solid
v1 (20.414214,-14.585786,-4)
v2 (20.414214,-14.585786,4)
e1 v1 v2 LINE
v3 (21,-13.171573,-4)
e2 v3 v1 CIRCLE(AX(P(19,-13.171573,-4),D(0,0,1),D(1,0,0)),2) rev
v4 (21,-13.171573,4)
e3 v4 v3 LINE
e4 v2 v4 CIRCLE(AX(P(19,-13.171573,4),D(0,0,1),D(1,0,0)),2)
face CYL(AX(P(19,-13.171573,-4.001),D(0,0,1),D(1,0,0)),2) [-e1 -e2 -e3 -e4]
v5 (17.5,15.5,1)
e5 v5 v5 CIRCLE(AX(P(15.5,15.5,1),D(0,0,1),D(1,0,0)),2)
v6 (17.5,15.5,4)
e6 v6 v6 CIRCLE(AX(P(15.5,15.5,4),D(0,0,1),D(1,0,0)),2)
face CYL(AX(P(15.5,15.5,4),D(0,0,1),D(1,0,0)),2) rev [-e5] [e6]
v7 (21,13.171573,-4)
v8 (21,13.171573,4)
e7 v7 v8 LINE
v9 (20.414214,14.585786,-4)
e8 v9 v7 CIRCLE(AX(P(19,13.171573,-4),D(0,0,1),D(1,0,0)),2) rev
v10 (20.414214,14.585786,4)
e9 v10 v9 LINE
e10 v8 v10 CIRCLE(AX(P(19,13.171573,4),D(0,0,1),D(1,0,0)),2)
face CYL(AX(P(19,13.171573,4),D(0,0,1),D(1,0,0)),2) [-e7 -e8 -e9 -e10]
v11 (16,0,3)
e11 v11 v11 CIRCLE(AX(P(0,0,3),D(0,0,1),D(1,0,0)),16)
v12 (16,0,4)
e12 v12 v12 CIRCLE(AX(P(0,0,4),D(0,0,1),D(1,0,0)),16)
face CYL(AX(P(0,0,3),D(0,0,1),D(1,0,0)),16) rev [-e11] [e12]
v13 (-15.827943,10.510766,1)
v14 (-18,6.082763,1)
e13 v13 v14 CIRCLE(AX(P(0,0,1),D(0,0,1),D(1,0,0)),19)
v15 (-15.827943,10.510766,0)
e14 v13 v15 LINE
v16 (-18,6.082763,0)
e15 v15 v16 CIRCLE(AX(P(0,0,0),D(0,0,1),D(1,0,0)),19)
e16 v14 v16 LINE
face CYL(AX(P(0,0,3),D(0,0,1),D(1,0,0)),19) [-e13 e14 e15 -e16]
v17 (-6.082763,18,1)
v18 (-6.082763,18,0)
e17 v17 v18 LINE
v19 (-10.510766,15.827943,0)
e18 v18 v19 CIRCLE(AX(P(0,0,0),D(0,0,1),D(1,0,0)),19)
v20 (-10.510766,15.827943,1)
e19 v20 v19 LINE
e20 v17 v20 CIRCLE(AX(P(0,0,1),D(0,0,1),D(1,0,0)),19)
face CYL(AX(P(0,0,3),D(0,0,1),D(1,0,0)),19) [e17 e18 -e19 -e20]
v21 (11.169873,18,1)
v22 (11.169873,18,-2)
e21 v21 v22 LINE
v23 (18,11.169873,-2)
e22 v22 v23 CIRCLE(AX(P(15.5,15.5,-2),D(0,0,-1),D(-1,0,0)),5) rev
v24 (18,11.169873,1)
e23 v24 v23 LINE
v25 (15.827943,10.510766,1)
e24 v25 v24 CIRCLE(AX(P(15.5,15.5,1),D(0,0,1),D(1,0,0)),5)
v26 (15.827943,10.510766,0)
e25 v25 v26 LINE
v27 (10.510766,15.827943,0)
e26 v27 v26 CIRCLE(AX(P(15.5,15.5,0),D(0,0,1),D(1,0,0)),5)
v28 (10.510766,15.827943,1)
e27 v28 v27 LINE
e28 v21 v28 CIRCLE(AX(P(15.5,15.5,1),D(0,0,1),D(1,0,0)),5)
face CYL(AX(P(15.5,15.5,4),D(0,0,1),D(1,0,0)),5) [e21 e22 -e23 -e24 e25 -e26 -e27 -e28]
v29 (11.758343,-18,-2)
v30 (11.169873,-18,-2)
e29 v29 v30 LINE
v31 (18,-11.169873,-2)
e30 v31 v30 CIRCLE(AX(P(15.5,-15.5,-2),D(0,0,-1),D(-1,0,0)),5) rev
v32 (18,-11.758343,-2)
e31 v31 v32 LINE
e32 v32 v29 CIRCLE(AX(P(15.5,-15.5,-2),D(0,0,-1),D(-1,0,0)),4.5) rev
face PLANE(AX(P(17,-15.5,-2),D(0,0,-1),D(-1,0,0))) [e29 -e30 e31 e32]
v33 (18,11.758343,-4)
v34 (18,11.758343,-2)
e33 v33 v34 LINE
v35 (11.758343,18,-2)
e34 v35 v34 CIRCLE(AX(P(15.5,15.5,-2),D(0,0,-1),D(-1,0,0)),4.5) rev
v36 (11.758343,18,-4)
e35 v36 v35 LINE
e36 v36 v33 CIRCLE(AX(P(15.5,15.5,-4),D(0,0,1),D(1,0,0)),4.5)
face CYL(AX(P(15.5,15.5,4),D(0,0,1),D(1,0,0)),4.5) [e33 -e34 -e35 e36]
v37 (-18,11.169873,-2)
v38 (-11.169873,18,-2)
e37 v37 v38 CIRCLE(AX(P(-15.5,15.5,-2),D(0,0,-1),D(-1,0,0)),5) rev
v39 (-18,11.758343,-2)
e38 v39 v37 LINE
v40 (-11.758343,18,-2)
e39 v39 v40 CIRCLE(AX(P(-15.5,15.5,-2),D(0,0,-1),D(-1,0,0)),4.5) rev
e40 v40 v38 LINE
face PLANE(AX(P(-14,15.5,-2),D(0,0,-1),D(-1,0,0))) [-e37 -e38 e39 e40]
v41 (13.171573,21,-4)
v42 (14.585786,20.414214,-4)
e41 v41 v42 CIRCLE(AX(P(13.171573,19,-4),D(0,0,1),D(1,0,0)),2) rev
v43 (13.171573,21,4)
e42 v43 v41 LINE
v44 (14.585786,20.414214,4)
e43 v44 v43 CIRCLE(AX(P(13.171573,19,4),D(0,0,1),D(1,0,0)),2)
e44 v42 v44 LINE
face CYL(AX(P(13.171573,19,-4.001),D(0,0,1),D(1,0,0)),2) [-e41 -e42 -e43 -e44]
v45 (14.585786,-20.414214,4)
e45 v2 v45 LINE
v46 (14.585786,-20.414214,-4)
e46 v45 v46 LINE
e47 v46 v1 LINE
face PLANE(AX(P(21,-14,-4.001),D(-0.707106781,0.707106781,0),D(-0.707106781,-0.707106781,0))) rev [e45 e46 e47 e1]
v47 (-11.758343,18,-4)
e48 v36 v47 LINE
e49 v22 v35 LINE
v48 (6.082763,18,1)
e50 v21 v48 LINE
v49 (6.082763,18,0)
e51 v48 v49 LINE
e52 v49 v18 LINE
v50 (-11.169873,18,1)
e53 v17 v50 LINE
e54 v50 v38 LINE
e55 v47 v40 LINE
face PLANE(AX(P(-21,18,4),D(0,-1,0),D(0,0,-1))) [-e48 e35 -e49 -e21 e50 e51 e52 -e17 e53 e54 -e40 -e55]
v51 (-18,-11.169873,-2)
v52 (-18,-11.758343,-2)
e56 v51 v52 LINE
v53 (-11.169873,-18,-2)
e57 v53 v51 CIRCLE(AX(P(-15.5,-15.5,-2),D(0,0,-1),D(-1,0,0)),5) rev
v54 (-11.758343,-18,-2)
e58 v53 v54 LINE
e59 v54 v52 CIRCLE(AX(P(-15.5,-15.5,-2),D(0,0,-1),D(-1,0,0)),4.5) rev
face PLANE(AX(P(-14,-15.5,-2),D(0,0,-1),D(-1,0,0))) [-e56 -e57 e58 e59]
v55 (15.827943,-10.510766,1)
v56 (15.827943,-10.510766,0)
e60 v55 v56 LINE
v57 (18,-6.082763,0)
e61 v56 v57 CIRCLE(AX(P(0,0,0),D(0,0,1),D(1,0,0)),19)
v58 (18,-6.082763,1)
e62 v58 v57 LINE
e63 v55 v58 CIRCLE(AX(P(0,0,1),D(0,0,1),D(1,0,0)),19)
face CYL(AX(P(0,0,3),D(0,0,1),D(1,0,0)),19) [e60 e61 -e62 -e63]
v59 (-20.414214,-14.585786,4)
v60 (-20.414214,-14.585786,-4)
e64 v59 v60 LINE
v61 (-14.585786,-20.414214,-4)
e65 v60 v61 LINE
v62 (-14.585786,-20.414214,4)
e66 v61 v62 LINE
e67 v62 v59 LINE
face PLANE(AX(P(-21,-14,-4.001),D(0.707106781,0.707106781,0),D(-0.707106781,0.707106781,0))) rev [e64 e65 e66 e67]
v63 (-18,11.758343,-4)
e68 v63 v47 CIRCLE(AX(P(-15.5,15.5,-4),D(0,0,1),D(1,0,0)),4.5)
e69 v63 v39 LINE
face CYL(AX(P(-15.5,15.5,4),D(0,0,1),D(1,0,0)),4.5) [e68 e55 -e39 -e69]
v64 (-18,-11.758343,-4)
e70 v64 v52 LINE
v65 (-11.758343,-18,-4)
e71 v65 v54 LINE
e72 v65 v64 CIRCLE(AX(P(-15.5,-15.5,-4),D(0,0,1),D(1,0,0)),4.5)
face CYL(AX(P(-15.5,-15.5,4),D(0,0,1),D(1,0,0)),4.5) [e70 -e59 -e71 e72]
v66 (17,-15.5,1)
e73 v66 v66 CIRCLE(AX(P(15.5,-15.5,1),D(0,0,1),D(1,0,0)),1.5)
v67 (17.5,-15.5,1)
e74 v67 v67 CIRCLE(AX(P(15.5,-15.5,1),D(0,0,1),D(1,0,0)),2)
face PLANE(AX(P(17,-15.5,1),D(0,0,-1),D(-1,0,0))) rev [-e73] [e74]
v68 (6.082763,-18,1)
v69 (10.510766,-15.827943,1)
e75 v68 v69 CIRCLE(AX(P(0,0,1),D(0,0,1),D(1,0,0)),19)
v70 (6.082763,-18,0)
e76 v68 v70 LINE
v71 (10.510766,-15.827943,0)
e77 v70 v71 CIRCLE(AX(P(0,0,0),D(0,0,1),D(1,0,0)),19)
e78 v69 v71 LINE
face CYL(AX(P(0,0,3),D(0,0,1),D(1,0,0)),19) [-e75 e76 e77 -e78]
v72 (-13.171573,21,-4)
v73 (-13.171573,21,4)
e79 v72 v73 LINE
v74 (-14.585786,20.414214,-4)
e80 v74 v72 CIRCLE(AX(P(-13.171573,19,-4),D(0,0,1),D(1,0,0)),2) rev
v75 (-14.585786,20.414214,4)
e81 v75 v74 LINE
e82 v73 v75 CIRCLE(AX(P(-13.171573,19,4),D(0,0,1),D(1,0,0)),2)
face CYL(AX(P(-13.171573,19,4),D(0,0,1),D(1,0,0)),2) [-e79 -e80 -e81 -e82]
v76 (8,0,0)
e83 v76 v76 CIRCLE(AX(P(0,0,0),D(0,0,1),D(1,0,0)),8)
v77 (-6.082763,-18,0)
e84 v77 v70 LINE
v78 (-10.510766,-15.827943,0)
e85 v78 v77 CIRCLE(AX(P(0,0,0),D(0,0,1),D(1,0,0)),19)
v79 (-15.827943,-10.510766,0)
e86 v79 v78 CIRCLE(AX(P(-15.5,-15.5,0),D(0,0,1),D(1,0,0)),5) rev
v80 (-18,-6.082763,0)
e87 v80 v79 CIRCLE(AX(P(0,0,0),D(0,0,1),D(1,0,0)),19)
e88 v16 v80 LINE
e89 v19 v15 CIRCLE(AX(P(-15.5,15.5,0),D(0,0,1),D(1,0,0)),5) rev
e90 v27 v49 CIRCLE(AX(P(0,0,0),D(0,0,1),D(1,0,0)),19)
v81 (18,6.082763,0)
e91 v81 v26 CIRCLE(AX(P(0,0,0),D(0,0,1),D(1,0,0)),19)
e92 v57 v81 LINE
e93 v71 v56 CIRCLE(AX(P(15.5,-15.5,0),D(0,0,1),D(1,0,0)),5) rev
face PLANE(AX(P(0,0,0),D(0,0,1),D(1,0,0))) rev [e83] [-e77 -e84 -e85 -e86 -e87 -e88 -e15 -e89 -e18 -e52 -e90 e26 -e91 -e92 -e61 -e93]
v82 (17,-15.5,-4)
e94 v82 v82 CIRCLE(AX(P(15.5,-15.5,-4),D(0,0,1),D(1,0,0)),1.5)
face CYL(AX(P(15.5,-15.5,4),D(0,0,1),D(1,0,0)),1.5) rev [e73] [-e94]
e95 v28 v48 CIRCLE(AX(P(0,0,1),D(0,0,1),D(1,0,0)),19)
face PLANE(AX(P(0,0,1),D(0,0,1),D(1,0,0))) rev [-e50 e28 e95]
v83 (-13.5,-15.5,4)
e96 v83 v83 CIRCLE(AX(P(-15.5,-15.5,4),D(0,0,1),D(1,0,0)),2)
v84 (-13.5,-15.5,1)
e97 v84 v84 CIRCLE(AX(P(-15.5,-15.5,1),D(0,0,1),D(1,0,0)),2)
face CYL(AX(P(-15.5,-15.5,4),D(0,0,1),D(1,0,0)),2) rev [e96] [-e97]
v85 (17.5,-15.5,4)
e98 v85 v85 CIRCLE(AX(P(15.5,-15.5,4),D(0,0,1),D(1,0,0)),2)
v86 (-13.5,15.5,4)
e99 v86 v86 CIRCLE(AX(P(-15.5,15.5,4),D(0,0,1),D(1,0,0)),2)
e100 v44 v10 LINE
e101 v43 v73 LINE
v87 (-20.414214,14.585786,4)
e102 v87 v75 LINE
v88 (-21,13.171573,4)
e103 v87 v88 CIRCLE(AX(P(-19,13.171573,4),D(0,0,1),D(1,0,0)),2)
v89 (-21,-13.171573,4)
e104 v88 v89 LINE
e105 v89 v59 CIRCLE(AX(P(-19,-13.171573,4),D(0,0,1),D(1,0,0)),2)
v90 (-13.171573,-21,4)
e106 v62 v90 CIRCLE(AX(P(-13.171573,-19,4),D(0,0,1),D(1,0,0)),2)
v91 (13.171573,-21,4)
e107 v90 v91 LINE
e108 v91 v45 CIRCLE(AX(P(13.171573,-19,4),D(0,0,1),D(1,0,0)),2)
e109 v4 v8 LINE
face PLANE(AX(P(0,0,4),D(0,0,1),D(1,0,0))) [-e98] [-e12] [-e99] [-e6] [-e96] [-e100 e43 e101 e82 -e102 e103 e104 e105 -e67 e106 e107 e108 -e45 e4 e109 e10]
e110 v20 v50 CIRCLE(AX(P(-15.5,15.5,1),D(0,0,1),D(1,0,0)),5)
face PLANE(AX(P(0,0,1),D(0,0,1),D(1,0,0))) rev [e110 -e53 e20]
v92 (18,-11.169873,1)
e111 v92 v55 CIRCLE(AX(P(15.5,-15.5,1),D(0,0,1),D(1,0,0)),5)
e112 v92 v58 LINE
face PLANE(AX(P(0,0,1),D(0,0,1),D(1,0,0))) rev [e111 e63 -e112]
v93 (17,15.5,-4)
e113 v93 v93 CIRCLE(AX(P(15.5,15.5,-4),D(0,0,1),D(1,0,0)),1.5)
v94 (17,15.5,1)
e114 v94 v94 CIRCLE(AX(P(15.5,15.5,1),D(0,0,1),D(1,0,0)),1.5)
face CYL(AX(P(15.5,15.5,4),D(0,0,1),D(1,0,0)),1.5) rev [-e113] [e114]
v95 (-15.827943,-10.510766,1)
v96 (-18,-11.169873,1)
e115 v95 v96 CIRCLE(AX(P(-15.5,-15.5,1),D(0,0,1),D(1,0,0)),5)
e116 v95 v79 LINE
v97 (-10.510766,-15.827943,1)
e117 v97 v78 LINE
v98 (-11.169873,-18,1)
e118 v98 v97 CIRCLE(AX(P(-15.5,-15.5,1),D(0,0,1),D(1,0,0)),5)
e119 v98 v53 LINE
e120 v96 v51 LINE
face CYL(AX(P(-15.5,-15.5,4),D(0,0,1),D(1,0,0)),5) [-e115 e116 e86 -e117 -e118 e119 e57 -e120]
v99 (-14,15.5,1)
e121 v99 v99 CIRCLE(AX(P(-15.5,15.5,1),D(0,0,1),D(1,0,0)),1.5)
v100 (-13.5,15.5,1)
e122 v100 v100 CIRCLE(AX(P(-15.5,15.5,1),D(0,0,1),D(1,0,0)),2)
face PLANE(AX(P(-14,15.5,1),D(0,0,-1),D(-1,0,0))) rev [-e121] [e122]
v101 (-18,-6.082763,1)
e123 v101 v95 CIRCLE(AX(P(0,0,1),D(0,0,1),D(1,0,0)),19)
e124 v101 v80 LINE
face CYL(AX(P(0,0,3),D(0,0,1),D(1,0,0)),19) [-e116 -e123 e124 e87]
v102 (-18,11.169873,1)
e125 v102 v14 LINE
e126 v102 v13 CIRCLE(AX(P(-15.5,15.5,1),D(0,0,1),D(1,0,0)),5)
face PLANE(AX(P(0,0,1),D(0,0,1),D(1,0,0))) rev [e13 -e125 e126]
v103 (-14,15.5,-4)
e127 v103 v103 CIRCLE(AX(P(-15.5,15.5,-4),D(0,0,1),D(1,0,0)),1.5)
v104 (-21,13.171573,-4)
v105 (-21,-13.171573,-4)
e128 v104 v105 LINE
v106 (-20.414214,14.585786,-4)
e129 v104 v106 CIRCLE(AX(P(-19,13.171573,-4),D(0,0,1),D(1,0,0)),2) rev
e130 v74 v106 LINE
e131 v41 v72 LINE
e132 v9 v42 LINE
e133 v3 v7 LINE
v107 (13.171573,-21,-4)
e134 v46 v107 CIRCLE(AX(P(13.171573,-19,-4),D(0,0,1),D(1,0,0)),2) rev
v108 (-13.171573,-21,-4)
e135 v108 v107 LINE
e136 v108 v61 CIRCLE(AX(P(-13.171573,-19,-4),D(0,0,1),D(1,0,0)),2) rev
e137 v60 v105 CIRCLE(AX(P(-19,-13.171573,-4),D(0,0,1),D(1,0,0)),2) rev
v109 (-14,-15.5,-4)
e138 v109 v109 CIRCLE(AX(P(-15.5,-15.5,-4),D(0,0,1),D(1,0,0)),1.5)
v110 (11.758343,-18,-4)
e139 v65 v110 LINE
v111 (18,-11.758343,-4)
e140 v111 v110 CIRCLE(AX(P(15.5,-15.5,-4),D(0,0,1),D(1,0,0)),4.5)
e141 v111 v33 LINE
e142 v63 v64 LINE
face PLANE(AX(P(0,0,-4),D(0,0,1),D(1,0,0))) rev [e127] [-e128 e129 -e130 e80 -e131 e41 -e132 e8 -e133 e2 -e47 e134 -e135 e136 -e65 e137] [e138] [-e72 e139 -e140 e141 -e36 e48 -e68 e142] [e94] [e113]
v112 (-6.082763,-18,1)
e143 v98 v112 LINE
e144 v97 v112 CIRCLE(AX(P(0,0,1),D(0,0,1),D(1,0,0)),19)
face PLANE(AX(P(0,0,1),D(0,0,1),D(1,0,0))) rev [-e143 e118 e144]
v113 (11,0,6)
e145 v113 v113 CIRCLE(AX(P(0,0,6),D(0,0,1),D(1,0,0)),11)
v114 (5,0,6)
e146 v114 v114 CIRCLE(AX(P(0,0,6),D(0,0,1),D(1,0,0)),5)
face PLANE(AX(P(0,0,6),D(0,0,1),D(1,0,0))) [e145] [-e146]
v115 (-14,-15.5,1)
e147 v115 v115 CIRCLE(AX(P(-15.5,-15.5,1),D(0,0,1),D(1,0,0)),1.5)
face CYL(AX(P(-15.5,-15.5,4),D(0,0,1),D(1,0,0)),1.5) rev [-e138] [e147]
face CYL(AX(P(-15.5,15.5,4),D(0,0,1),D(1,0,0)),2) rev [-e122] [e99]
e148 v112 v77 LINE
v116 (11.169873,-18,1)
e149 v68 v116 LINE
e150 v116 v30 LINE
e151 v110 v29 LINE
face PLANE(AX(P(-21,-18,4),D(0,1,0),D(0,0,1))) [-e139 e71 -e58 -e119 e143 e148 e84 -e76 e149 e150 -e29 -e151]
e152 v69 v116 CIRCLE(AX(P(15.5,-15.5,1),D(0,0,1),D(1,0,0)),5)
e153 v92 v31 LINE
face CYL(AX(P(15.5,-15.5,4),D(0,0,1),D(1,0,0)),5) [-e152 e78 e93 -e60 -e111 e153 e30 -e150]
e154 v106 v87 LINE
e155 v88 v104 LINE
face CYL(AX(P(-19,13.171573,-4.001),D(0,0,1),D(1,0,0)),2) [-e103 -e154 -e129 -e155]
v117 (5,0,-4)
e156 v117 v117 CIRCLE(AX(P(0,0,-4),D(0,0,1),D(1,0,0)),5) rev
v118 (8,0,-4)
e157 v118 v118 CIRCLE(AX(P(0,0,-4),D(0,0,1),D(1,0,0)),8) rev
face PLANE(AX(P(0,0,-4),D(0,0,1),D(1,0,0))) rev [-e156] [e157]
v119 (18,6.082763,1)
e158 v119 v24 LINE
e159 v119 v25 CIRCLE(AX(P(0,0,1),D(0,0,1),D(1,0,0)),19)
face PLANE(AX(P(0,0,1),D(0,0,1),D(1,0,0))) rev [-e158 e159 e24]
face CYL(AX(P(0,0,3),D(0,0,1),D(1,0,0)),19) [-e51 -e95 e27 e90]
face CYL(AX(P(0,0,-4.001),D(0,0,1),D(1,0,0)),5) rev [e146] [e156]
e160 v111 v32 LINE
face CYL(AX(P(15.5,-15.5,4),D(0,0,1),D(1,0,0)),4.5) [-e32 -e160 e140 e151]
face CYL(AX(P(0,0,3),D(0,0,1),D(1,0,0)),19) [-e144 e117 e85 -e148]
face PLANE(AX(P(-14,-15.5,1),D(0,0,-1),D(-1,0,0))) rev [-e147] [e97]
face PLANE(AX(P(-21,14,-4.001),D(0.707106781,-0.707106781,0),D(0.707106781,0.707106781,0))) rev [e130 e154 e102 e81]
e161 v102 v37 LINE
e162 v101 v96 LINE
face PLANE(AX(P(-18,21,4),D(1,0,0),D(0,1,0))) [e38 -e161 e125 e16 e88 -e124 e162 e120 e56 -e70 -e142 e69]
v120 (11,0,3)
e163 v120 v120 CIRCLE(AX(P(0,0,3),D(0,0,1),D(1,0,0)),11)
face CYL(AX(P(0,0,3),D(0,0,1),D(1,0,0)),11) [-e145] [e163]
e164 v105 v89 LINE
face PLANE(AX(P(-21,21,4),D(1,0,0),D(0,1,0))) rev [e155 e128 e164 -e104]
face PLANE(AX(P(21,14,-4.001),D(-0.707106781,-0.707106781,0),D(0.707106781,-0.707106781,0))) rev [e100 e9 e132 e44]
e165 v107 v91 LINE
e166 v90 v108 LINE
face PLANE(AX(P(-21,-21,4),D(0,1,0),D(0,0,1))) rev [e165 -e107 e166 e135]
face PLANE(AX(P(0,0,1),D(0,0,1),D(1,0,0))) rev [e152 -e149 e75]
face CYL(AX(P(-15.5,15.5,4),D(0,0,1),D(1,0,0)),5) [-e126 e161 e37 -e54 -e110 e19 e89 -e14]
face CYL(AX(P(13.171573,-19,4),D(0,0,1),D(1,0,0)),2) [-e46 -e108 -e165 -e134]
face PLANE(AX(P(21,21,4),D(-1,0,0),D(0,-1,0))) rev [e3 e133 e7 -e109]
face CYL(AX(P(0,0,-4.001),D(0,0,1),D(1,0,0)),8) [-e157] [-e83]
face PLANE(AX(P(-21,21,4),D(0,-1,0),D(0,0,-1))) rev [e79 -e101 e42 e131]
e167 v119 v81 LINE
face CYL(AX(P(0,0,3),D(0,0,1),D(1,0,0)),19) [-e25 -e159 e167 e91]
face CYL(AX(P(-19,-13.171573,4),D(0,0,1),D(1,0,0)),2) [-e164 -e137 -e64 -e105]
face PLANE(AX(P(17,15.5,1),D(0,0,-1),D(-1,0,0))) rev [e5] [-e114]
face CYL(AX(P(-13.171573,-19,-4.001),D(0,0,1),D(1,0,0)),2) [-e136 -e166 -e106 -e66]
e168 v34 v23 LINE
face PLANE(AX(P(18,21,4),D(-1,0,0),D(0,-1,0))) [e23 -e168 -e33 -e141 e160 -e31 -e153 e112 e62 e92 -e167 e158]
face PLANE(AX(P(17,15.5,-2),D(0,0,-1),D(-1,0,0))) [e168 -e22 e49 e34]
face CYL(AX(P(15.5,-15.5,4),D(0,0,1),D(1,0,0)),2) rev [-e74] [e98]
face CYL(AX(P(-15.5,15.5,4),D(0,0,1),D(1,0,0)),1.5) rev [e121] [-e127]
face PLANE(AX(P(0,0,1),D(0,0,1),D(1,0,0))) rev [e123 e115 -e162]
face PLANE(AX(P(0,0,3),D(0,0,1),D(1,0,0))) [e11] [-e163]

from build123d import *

# Parameters (mm, degrees)
SKETCH1_W                               = 42
SKETCH1_H                               = 42
BOSS_EXTRUDE1_DEPTH                     = 4
CUT_EXTRUDE1_REACH                      = 32.757
SKETCH3_R                               = 16
SKETCH3_R_2                             = 11
CUT_EXTRUDE2_DEPTH                      = 1
BOSS_EXTRUDE2_START                     = 2
SKETCH4_R                               = 11
BOSS_EXTRUDE2_DEPTH                     = 2
CUT_EXTRUDE3_REACH                      = 33.337
SKETCH5_R                               = 5
CBORE_FOR_M5_HEX_HEAD_BOLT2_D           = 3
CBORE_FOR_M5_HEX_HEAD_BOLT2_DEPTH       = 10
CBORE_FOR_M5_HEX_HEAD_BOLT2_CBORE_D     = 4
CBORE_FOR_M5_HEX_HEAD_BOLT2_CBORE_DEPTH = 3
CBORE_FOR_M5_HEX_HEAD_BOLT2_TIP         = 0.901290929
SHELL1_START                            = -4
SHELL1_OUTLINE_R                        = 8
SHELL1_DEPTH                            = 4
SHELL1_2_DEPTH                          = 2
SHELL1_3_DEPTH                          = 1
FILLET1_R                               = 2


# Read off the part's stored shape, not the designer's step: Shell1
with BuildPart() as part:
    # Sketch1 → Boss-Extrude1 (new, symmetric)
    with BuildSketch(Plane.XY):
        Rectangle(SKETCH1_W, SKETCH1_H)
    extrude(amount=BOSS_EXTRUDE1_DEPTH, both=True)

    # Sketch2 → Cut-Extrude1 (cut, up to next)
    with BuildSketch(Plane.XY.offset(4), mode=Mode.PRIVATE) as cut_extrude1_sk1:
        Polygon((-21, 21), (-21, 14), (-14, 21), align=None)
    cut_extrude1_tool1 = extrude(cut_extrude1_sk1.sketch, amount=-CUT_EXTRUDE1_REACH, mode=Mode.PRIVATE) & part.part
    # Sketch2 → Cut-Extrude1 (cut, up to next)
    with BuildSketch(Plane.XY.offset(4), mode=Mode.PRIVATE) as cut_extrude1_sk2:
        Polygon((21, 14), (14, 21), (21, 21), align=None)
    cut_extrude1_tool2 = extrude(cut_extrude1_sk2.sketch, amount=-CUT_EXTRUDE1_REACH, mode=Mode.PRIVATE) & part.part
    # Sketch2 → Cut-Extrude1 (cut, up to next)
    with BuildSketch(Plane.XY.offset(4), mode=Mode.PRIVATE) as cut_extrude1_sk3:
        Polygon((21, -21), (21, -14), (14, -21), align=None)
    cut_extrude1_tool3 = extrude(cut_extrude1_sk3.sketch, amount=-CUT_EXTRUDE1_REACH, mode=Mode.PRIVATE) & part.part
    # Sketch2 → Cut-Extrude1 (cut, up to next)
    with BuildSketch(Plane.XY.offset(4), mode=Mode.PRIVATE) as cut_extrude1_sk4:
        Polygon((-21, -14), (-14, -21), (-21, -21), align=None)
    cut_extrude1_tool4 = extrude(cut_extrude1_sk4.sketch, amount=-CUT_EXTRUDE1_REACH, mode=Mode.PRIVATE) & part.part
    add(cut_extrude1_tool1.solids().sort_by_distance((-18.666667, 18.666667, 4))[0], mode=Mode.SUBTRACT)
    add(cut_extrude1_tool2.solids().sort_by_distance((18.666667, 18.666667, 4))[0], mode=Mode.SUBTRACT)
    add(cut_extrude1_tool3.solids().sort_by_distance((18.666667, -18.666667, 4))[0], mode=Mode.SUBTRACT)
    add(cut_extrude1_tool4.solids().sort_by_distance((-18.666667, -18.666667, 4))[0], mode=Mode.SUBTRACT)

    # Sketch3 → Cut-Extrude2 (cut)
    with BuildSketch(Plane.XY.offset(4)):
        Circle(SKETCH3_R)
        Circle(SKETCH3_R_2, mode=Mode.SUBTRACT)
    extrude(amount=-CUT_EXTRUDE2_DEPTH, mode=Mode.SUBTRACT)

    # Sketch4 → Boss-Extrude2 (add)
    with BuildSketch(Plane.XY.offset(4).offset(BOSS_EXTRUDE2_START)):
        Circle(SKETCH4_R)
    extrude(amount=-BOSS_EXTRUDE2_DEPTH)

    # Sketch5 → Cut-Extrude3 (cut, up to next)
    with BuildSketch(Plane.XY.offset(6), mode=Mode.PRIVATE) as cut_extrude3_sk1:
        Circle(SKETCH5_R)
    cut_extrude3_tool1 = extrude(cut_extrude3_sk1.sketch, amount=-CUT_EXTRUDE3_REACH, mode=Mode.PRIVATE) & part.part
    add(cut_extrude3_tool1.solids().sort_by_distance((0, 0, 6))[0], mode=Mode.SUBTRACT)

    # CBORE for M5 Hex Head Bolt2
    with Locations(Plane.XY.offset(4)):
        with Locations((-15.5, 15.5), (15.5, 15.5), (15.5, -15.5), (-15.5, -15.5)):
            CounterBoreHole(CBORE_FOR_M5_HEX_HEAD_BOLT2_D / 2, CBORE_FOR_M5_HEX_HEAD_BOLT2_CBORE_D / 2, CBORE_FOR_M5_HEX_HEAD_BOLT2_CBORE_DEPTH, depth=CBORE_FOR_M5_HEX_HEAD_BOLT2_DEPTH)
            with Locations((0, 0, -(CBORE_FOR_M5_HEX_HEAD_BOLT2_DEPTH + CBORE_FOR_M5_HEX_HEAD_BOLT2_TIP / 2))):  # 118° drill point
                Cone(0, CBORE_FOR_M5_HEX_HEAD_BOLT2_D / 2, CBORE_FOR_M5_HEX_HEAD_BOLT2_TIP, mode=Mode.SUBTRACT)

    # Shell1 outline → Shell1 (cut)
    with BuildSketch(Plane.XY.offset(SHELL1_START)):
        with BuildLine():
            ThreePointArc((-18, -11.169872981), (-11.964466094, -11.964466094), (-11.169872981, -18))
            Line((-11.169872981, -18), (11.169872981, -18))
            ThreePointArc((11.169872981, -18), (11.964466094, -11.964466094), (18, -11.169872981))
            Line((18, -11.169872981), (18, 11.169872981))
            ThreePointArc((18, 11.169872981), (11.964466094, 11.964466094), (11.169872981, 18))
            Line((11.169872981, 18), (-11.169872981, 18))
            ThreePointArc((-11.169872981, 18), (-11.964466094, 11.964466094), (-18, 11.169872981))
            Line((-18, 11.169872981), (-18, -11.169872981))
        make_face()
        Circle(SHELL1_OUTLINE_R, mode=Mode.SUBTRACT)
    extrude(amount=SHELL1_DEPTH, mode=Mode.SUBTRACT)

    # Shell1 2 outline → Shell1 2 (cut)
    with BuildSketch(Plane.XY.offset(SHELL1_START)):
        with BuildLine():
            Line((-18, -11.169872981), (-18, -11.758342613))
            ThreePointArc((-18, -11.758342613), (-12.318019485, -12.318019485), (-11.758342613, -18))
            Line((-11.758342613, -18), (-11.169872981, -18))
            ThreePointArc((-11.169872981, -18), (-11.964466094, -11.964466094), (-18, -11.169872981))
        make_face()
        with BuildLine():
            Line((-18, 11.758342613), (-18, 11.169872981))
            ThreePointArc((-18, 11.169872981), (-11.964466094, 11.964466094), (-11.169872981, 18))
            Line((-11.169872981, 18), (-11.758342613, 18))
            ThreePointArc((-11.758342613, 18), (-12.318019485, 12.318019485), (-18, 11.758342613))
        make_face()
        with BuildLine():
            ThreePointArc((18, -11.169872981), (11.964466094, -11.964466094), (11.169872981, -18))
            Line((11.169872981, -18), (11.758342613, -18))
            ThreePointArc((11.758342613, -18), (12.318019485, -12.318019485), (18, -11.758342613))
            Line((18, -11.758342613), (18, -11.169872981))
        make_face()
        with BuildLine():
            Line((11.758342613, 18), (11.169872981, 18))
            ThreePointArc((11.169872981, 18), (11.964466094, 11.964466094), (18, 11.169872981))
            Line((18, 11.169872981), (18, 11.758342613))
            ThreePointArc((18, 11.758342613), (12.318019485, 12.318019485), (11.758342613, 18))
        make_face()
    extrude(amount=SHELL1_2_DEPTH, mode=Mode.SUBTRACT)

    # Shell1 3 outline → Shell1 3 (cut)
    with BuildSketch(Plane.XY):
        with BuildLine():
            Line((-18, -6.08276253), (-18, -11.169872981))
            ThreePointArc((-18, -11.169872981), (-16.951868237, -10.715433288), (-15.827943399, -10.510766278))
            ThreePointArc((-15.827943399, -10.510766278), (-17.058260256, -8.367541876), (-18, -6.08276253))
        make_face()
        with BuildLine():
            ThreePointArc((-10.510766278, -15.827943399), (-10.715433288, -16.951868237), (-11.169872981, -18))
            Line((-11.169872981, -18), (-6.08276253, -18))
            ThreePointArc((-6.08276253, -18), (-8.367541876, -17.058260256), (-10.510766278, -15.827943399))
        make_face()
        with BuildLine():
            Line((-18, 11.169872981), (-18, 6.08276253))
            ThreePointArc((-18, 6.08276253), (-17.058260256, 8.367541876), (-15.827943399, 10.510766279))
            ThreePointArc((-15.827943399, 10.510766279), (-16.951868237, 10.715433288), (-18, 11.169872981))
        make_face()
        with BuildLine():
            ThreePointArc((10.510766279, -15.827943399), (8.367541876, -17.058260256), (6.08276253, -18))
            Line((6.08276253, -18), (11.169872981, -18))
            ThreePointArc((11.169872981, -18), (10.715433288, -16.951868237), (10.510766279, -15.827943399))
        make_face()
        with BuildLine():
            ThreePointArc((-11.169872981, 18), (-10.715433288, 16.951868237), (-10.510766278, 15.827943399))
            ThreePointArc((-10.510766278, 15.827943399), (-8.367541876, 17.058260256), (-6.08276253, 18))
            Line((-6.08276253, 18), (-11.169872981, 18))
        make_face()
        with BuildLine():
            ThreePointArc((18, -6.08276253), (17.058260256, -8.367541876), (15.827943399, -10.510766279))
            ThreePointArc((15.827943399, -10.510766279), (16.951868237, -10.715433288), (18, -11.169872981))
            Line((18, -11.169872981), (18, -6.08276253))
        make_face()
        with BuildLine():
            Line((11.169872981, 18), (6.08276253, 18))
            ThreePointArc((6.08276253, 18), (8.367541876, 17.058260256), (10.510766279, 15.827943399))
            ThreePointArc((10.510766279, 15.827943399), (10.715433288, 16.951868237), (11.169872981, 18))
        make_face()
        with BuildLine():
            ThreePointArc((15.827943399, 10.510766279), (17.058260256, 8.367541876), (18, 6.08276253))
            Line((18, 6.08276253), (18, 11.169872981))
            ThreePointArc((18, 11.169872981), (16.951868237, 10.715433288), (15.827943399, 10.510766279))
        make_face()
    extrude(amount=SHELL1_3_DEPTH, mode=Mode.SUBTRACT)

    # Fillet1
    fillet1_edges = [part.edges().sort_by_distance(p)[0] for p in [
        (-21, -14, 0),
        (-14, -21, 0),
        (14, -21, 0),
        (21, -14, 0),
        (21, 14, 0),
        (14, 21, 0),
        (-14, 21, 0),
        (-21, 14, 0),
    ]]
    fillet(fillet1_edges, radius=FILLET1_R)


solid = part.part
